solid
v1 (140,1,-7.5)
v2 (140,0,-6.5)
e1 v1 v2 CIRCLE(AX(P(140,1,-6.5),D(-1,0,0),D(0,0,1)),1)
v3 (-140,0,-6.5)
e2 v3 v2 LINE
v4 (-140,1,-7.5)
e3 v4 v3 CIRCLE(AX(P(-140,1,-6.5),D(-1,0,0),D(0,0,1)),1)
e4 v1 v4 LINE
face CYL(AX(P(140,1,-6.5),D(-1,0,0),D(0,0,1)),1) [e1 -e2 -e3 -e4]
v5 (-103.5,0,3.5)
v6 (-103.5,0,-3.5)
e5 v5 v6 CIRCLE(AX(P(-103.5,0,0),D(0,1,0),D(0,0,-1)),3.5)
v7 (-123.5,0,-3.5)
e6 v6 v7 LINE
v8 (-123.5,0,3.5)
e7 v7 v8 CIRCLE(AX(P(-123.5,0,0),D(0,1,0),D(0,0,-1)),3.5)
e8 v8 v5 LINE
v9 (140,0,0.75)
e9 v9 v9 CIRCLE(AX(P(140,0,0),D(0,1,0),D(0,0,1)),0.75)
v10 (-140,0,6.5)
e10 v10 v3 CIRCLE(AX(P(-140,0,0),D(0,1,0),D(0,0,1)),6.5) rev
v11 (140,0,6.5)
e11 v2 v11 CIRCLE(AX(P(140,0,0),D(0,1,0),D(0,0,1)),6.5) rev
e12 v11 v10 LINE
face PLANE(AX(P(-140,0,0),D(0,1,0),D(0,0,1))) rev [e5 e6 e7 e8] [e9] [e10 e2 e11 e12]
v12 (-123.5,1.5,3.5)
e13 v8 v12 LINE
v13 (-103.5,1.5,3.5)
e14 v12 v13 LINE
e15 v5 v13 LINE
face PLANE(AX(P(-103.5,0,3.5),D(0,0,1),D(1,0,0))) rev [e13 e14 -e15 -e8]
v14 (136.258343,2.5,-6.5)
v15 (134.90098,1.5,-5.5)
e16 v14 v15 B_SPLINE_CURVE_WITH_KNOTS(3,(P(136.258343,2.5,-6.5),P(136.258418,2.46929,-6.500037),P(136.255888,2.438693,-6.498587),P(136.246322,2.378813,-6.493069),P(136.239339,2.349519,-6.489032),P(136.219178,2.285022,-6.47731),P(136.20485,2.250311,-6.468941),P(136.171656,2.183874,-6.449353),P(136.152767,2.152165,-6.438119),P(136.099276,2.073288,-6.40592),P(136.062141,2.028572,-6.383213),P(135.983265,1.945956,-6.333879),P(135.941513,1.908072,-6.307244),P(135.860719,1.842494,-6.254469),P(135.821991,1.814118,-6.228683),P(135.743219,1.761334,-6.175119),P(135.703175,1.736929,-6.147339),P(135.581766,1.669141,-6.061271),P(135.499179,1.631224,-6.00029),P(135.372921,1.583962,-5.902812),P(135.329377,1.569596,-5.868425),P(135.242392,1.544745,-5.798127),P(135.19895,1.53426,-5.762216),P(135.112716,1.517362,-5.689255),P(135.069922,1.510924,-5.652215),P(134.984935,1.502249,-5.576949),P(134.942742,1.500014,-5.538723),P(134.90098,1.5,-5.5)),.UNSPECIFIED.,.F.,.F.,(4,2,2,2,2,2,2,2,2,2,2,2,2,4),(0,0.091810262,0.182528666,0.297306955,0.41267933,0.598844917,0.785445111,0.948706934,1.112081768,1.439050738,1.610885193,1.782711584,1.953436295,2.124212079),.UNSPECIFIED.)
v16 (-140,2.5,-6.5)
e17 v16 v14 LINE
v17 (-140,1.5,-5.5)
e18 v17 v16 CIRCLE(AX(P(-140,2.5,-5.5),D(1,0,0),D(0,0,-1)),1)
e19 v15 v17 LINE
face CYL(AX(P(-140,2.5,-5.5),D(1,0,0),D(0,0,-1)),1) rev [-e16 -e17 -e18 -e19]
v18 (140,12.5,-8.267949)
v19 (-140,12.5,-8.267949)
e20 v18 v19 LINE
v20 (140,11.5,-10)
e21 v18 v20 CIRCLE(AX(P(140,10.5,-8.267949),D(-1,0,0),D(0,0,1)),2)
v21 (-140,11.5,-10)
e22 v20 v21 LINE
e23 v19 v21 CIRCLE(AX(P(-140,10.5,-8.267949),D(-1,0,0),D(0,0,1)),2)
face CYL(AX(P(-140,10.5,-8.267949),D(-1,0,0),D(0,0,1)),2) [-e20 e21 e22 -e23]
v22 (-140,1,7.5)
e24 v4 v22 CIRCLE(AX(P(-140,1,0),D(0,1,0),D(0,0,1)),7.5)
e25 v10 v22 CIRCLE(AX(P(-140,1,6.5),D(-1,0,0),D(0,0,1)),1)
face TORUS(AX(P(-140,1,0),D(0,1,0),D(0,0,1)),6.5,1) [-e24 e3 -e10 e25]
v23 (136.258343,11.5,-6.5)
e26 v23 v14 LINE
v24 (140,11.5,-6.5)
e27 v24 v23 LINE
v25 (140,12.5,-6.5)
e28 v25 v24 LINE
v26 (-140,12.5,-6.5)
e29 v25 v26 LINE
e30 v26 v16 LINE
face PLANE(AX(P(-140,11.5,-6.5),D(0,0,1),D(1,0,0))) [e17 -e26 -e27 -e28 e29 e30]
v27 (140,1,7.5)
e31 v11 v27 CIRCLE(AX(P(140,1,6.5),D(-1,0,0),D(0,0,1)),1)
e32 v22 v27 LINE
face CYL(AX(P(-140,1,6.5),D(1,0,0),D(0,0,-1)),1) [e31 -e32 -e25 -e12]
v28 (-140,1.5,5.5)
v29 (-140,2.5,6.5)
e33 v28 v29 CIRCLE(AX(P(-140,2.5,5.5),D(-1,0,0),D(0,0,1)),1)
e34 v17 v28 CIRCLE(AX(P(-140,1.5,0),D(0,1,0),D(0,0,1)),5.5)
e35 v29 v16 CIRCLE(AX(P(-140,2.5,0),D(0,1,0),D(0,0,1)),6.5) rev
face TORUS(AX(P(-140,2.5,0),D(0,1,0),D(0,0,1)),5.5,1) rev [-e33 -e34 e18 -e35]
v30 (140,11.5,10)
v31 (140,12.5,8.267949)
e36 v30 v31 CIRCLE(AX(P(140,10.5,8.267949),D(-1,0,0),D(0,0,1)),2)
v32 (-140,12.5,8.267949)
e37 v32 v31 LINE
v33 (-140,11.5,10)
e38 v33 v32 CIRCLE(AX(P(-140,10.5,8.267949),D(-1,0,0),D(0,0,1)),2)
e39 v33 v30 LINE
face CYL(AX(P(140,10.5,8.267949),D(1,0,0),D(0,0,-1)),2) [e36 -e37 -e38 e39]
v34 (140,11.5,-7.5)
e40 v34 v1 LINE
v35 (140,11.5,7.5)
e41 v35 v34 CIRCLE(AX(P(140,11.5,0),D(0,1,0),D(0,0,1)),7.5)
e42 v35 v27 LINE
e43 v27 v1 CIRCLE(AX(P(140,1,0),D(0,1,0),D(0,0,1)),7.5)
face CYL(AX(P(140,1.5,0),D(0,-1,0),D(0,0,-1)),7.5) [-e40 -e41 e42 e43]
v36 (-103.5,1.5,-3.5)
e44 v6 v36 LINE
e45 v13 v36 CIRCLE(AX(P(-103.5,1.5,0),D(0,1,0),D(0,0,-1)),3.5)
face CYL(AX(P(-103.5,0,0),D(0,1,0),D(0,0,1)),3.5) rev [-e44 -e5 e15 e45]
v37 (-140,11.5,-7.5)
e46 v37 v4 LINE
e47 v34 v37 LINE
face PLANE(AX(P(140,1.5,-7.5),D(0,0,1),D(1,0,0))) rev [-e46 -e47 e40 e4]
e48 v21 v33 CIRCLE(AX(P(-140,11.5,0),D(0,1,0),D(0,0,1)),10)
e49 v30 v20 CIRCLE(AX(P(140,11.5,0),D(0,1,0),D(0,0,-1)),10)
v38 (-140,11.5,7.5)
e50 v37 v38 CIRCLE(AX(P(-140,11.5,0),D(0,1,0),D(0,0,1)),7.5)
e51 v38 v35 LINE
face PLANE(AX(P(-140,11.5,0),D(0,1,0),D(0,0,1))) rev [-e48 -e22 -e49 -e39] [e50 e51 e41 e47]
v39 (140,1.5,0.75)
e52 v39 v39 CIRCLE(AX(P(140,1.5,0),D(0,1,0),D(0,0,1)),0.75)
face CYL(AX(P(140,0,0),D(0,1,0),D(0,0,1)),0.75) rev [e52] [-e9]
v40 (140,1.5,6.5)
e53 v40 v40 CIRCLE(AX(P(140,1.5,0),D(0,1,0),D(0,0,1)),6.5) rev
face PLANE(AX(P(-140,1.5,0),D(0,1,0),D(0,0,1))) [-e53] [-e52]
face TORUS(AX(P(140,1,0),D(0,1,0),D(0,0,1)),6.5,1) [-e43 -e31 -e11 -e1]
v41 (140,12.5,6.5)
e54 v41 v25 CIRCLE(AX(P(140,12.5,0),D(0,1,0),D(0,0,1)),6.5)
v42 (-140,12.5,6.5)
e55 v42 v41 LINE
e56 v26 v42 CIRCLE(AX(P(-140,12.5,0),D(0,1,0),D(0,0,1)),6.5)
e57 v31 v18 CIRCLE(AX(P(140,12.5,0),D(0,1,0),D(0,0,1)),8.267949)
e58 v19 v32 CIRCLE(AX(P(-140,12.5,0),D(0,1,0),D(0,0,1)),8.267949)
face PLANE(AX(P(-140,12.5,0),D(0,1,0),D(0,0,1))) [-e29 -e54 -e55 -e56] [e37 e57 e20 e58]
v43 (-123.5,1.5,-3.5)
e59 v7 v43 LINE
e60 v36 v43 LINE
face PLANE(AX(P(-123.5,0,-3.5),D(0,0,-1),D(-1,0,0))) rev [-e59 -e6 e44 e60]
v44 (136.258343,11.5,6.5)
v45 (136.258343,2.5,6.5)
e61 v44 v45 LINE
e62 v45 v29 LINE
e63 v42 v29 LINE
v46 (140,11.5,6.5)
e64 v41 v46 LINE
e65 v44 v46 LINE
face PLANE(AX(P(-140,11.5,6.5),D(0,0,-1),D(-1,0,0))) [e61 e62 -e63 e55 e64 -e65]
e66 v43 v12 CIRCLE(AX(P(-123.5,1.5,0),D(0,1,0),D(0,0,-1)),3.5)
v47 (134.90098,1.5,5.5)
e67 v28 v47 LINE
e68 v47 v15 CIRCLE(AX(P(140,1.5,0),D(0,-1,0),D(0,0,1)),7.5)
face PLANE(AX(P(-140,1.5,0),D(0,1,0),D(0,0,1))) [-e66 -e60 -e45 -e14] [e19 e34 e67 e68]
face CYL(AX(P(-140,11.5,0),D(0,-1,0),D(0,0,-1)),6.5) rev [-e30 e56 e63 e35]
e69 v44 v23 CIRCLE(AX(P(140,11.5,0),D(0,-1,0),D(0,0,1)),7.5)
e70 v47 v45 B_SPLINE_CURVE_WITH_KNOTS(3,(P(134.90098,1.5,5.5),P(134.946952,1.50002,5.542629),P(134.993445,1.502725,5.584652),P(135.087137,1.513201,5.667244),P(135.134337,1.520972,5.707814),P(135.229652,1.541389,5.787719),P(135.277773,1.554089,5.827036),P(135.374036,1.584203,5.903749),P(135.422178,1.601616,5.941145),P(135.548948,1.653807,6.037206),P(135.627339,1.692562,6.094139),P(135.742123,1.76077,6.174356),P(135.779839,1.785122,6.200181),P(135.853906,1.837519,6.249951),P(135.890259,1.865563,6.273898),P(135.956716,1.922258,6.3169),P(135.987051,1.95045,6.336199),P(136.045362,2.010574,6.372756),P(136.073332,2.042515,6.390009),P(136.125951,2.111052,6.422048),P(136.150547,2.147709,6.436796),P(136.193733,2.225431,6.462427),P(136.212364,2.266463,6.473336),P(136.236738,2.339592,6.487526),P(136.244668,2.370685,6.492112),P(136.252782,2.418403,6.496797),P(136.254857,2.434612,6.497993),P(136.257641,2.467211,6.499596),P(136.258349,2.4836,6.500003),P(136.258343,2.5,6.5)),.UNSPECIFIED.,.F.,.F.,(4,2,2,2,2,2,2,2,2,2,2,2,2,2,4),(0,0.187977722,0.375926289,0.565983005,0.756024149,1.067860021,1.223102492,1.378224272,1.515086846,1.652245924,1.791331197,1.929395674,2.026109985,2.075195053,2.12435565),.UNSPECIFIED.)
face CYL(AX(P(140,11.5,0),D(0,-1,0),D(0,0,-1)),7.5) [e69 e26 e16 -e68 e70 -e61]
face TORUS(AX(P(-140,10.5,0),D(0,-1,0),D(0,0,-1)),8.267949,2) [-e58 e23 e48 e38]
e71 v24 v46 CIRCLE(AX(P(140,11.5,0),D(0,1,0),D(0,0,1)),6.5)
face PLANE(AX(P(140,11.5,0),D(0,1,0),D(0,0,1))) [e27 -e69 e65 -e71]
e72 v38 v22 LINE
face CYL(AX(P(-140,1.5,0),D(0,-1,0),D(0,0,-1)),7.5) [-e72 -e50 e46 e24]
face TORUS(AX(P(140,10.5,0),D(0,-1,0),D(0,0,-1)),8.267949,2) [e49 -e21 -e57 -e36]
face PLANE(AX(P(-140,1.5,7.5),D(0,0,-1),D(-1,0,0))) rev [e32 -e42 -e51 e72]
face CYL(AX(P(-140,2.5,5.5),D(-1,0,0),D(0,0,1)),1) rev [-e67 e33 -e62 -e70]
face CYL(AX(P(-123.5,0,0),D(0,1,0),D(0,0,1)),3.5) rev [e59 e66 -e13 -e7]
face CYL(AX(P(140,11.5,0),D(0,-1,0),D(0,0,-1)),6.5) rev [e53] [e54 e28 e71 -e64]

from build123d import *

# Parameters (mm, degrees)
BOSS_EXTRUDE1_DEPTH = 1.5
SKETCH2_R           = 6.5
BOSS_EXTRUDE2_DEPTH = 10
BOSS_EXTRUDE3_DEPTH = 1
FILLET1_R           = 2
FILLET2_R           = 1
FILLET3_R           = 1
CUT_EXTRUDE1_DEPTH  = 151.73486657
SKETCH5_R           = 0.75
CUT_EXTRUDE2_DEPTH  = 151.73486657


with BuildPart() as part:
    # Sketch1 → Boss-Extrude1 (new body)
    with BuildSketch(Plane(origin=(0, 0, 0), x_dir=(1, 0, 0), z_dir=(0, 1, 0))):
        with BuildLine():
            Line((140, 7.5), (-140, 7.5))
            ThreePointArc((-140, 7.5), (-147.5, 0), (-140, -7.5))
            Line((-140, -7.5), (140, -7.5))
            ThreePointArc((140, -7.5), (147.5, 0), (140, 7.5))
        make_face()
    extrude(amount=BOSS_EXTRUDE1_DEPTH)

    # Sketch2 → Boss-Extrude2 (add)
    with BuildSketch(Plane(origin=(0, 1.5, 0), x_dir=(1, 0, 0), z_dir=(0, 1, 0))):
        with BuildLine():
            Line((-140, -7.5), (140, -7.5))
            ThreePointArc((140, -7.5), (147.5, 0), (140, 7.5))
            Line((140, 7.5), (-140, 7.5))
            ThreePointArc((-140, 7.5), (-147.5, 0), (-140, -7.5))
        make_face()
        with Locations(Location((140, 0, 0), (0, 0, 270))):
            Circle(SKETCH2_R, mode=Mode.SUBTRACT)
        with BuildLine():
            Line((-140, 6.5), (136.258342613, 6.5))
            ThreePointArc((136.258342613, 6.5), (132.5, 0), (136.258342613, -6.5))
            Line((136.258342613, -6.5), (-140, -6.5))
            ThreePointArc((-140, -6.5), (-146.5, 0), (-140, 6.5))
        make_face(mode=Mode.SUBTRACT)
    extrude(amount=BOSS_EXTRUDE2_DEPTH)

    # Sketch3 → Boss-Extrude3 (add)
    with BuildSketch(Plane(origin=(0, 11.5, 0), x_dir=(1, 0, 0), z_dir=(0, 1, 0))):
        with BuildLine():
            Line((-140, 10), (140, 10))
            ThreePointArc((140, 10), (150, 0), (140, -10))
            Line((140, -10), (-140, -10))
            ThreePointArc((-140, -10), (-150, 0), (-140, 10))
        make_face()
        with BuildLine():
            Line((-140, -6.5), (136.258342613, -6.5))
            Line((136.258342613, -6.5), (140, -6.5))
            ThreePointArc((140, -6.5), (146.5, 0), (140, 6.5))
            Line((140, 6.5), (136.258342613, 6.5))
            Line((136.258342613, 6.5), (-140, 6.5))
            ThreePointArc((-140, 6.5), (-146.5, 0), (-140, -6.5))
        make_face(mode=Mode.SUBTRACT)
    extrude(amount=BOSS_EXTRUDE3_DEPTH)

    # Fillet1
    # the kernel refuses this fillet: 2 mm, written as the material it takes off along each edge
    with BuildSketch(Plane(origin=(-140, 12.5, 0), x_dir=(0, 0, 1), z_dir=(1, 0, 0))) as fillet1_piece_1:
        with BuildLine():
            CenterArc((8.267949192, 2), FILLET1_R, 270, 60)
            Line((10, 1), (10.034641016, 0.98))
            ThreePointArc((10.034641016, 0.98), (10.04, 0.5), (10.04, 0))
            Line((10.04, 0), (10, -0.04))
            Line((10, -0.04), (8.267949192, -0.04))
            Line((8.267949192, -0.04), (8.267949192, 0))
        make_face()
    revolve(axis=Axis((-140, 12.5, 0), (0, -1, 0)), revolution_arc=180, mode=Mode.SUBTRACT)
    with BuildSketch(Plane(origin=(140, 12.5, 10), x_dir=(0, -1, 0), z_dir=(-1, 0, 0))) as fillet1_piece_2:
        with BuildLine():
            CenterArc((2, -1.732050808), FILLET1_R, 120, 60)
            Line((0, -1.732050808), (-0.04, -1.732050808))
            Line((-0.04, -1.732050808), (-0.04, 0))
            Line((-0.04, 0), (0, 0.04))
            ThreePointArc((0, 0.04), (0.5, 0.04), (0.98, 0.034641016))
            Line((0.98, 0.034641016), (1, 0))
        make_face()
    extrude(amount=280, mode=Mode.SUBTRACT)
    with BuildSketch(Plane(origin=(140, 12.5, 0), x_dir=(0, 0, -1), z_dir=(-1, 0, 0))) as fillet1_piece_3:
        with BuildLine():
            CenterArc((8.267949192, 2), FILLET1_R, 270, 60)
            Line((10, 1), (10.034641016, 0.98))
            ThreePointArc((10.034641016, 0.98), (10.04, 0.5), (10.04, 0))
            Line((10.04, 0), (10, -0.04))
            Line((10, -0.04), (8.267949192, -0.04))
            Line((8.267949192, -0.04), (8.267949192, 0))
        make_face()
    revolve(axis=Axis((140, 12.5, 0), (0, -1, 0)), revolution_arc=180, mode=Mode.SUBTRACT)
    with BuildSketch(Plane(origin=(-140, 12.5, -10), x_dir=(0, 0, 1), z_dir=(1, 0, 0))) as fillet1_piece_4:
        with BuildLine():
            CenterArc((1.732050808, 2), FILLET1_R, 210, 60)
            Line((0, 1), (-0.034641016, 0.98))
            ThreePointArc((-0.034641016, 0.98), (-0.04, 0.5), (-0.04, 0))
            Line((-0.04, 0), (0, -0.04))
            Line((0, -0.04), (1.732050808, -0.04))
            Line((1.732050808, -0.04), (1.732050808, 0))
        make_face()
    extrude(amount=280, mode=Mode.SUBTRACT)

    # Fillet2
    fillet2_edges = [part.edges().sort_by_distance(p)[0] for p in [
        (0, 0, -7.5),
        (147.5, 0, 0),
        (0, 0, 7.5),
        (-147.5, 0, 0),
    ]]
    fillet(fillet2_edges, radius=FILLET2_R)

    # Fillet3
    fillet3_edges = [part.edges().sort_by_distance(p)[0] for p in [
        (-146.5, 1.5, 0),
        (-1.870828693, 1.5, 6.5),
        (-1.870828693, 1.5, -6.5),
    ]]
    fillet(fillet3_edges, radius=FILLET3_R)

    # Sketch4 → Cut-Extrude1 (cut, through all)
    with BuildSketch(Plane(origin=(0, 1.5, 0), x_dir=(1, 0, 0), z_dir=(0, 1, 0))):
        with BuildLine():
            Line((-123.5, 3.5), (-103.5, 3.5))
            ThreePointArc((-103.5, 3.5), (-100, 0), (-103.5, -3.5))
            Line((-103.5, -3.5), (-123.5, -3.5))
            ThreePointArc((-123.5, -3.5), (-127, 0), (-123.5, 3.5))
        make_face()
    extrude(amount=-CUT_EXTRUDE1_DEPTH, mode=Mode.SUBTRACT)

    # Sketch5 → Cut-Extrude2 (cut, through all)
    with BuildSketch(Plane(origin=(0, 1.5, 0), x_dir=(1, 0, 0), z_dir=(0, 1, 0))):
        with Locations(Location((140, 0, 0), (0, 0, 270))):
            Circle(SKETCH5_R)
    extrude(amount=-CUT_EXTRUDE2_DEPTH, mode=Mode.SUBTRACT)


solid = part.part
